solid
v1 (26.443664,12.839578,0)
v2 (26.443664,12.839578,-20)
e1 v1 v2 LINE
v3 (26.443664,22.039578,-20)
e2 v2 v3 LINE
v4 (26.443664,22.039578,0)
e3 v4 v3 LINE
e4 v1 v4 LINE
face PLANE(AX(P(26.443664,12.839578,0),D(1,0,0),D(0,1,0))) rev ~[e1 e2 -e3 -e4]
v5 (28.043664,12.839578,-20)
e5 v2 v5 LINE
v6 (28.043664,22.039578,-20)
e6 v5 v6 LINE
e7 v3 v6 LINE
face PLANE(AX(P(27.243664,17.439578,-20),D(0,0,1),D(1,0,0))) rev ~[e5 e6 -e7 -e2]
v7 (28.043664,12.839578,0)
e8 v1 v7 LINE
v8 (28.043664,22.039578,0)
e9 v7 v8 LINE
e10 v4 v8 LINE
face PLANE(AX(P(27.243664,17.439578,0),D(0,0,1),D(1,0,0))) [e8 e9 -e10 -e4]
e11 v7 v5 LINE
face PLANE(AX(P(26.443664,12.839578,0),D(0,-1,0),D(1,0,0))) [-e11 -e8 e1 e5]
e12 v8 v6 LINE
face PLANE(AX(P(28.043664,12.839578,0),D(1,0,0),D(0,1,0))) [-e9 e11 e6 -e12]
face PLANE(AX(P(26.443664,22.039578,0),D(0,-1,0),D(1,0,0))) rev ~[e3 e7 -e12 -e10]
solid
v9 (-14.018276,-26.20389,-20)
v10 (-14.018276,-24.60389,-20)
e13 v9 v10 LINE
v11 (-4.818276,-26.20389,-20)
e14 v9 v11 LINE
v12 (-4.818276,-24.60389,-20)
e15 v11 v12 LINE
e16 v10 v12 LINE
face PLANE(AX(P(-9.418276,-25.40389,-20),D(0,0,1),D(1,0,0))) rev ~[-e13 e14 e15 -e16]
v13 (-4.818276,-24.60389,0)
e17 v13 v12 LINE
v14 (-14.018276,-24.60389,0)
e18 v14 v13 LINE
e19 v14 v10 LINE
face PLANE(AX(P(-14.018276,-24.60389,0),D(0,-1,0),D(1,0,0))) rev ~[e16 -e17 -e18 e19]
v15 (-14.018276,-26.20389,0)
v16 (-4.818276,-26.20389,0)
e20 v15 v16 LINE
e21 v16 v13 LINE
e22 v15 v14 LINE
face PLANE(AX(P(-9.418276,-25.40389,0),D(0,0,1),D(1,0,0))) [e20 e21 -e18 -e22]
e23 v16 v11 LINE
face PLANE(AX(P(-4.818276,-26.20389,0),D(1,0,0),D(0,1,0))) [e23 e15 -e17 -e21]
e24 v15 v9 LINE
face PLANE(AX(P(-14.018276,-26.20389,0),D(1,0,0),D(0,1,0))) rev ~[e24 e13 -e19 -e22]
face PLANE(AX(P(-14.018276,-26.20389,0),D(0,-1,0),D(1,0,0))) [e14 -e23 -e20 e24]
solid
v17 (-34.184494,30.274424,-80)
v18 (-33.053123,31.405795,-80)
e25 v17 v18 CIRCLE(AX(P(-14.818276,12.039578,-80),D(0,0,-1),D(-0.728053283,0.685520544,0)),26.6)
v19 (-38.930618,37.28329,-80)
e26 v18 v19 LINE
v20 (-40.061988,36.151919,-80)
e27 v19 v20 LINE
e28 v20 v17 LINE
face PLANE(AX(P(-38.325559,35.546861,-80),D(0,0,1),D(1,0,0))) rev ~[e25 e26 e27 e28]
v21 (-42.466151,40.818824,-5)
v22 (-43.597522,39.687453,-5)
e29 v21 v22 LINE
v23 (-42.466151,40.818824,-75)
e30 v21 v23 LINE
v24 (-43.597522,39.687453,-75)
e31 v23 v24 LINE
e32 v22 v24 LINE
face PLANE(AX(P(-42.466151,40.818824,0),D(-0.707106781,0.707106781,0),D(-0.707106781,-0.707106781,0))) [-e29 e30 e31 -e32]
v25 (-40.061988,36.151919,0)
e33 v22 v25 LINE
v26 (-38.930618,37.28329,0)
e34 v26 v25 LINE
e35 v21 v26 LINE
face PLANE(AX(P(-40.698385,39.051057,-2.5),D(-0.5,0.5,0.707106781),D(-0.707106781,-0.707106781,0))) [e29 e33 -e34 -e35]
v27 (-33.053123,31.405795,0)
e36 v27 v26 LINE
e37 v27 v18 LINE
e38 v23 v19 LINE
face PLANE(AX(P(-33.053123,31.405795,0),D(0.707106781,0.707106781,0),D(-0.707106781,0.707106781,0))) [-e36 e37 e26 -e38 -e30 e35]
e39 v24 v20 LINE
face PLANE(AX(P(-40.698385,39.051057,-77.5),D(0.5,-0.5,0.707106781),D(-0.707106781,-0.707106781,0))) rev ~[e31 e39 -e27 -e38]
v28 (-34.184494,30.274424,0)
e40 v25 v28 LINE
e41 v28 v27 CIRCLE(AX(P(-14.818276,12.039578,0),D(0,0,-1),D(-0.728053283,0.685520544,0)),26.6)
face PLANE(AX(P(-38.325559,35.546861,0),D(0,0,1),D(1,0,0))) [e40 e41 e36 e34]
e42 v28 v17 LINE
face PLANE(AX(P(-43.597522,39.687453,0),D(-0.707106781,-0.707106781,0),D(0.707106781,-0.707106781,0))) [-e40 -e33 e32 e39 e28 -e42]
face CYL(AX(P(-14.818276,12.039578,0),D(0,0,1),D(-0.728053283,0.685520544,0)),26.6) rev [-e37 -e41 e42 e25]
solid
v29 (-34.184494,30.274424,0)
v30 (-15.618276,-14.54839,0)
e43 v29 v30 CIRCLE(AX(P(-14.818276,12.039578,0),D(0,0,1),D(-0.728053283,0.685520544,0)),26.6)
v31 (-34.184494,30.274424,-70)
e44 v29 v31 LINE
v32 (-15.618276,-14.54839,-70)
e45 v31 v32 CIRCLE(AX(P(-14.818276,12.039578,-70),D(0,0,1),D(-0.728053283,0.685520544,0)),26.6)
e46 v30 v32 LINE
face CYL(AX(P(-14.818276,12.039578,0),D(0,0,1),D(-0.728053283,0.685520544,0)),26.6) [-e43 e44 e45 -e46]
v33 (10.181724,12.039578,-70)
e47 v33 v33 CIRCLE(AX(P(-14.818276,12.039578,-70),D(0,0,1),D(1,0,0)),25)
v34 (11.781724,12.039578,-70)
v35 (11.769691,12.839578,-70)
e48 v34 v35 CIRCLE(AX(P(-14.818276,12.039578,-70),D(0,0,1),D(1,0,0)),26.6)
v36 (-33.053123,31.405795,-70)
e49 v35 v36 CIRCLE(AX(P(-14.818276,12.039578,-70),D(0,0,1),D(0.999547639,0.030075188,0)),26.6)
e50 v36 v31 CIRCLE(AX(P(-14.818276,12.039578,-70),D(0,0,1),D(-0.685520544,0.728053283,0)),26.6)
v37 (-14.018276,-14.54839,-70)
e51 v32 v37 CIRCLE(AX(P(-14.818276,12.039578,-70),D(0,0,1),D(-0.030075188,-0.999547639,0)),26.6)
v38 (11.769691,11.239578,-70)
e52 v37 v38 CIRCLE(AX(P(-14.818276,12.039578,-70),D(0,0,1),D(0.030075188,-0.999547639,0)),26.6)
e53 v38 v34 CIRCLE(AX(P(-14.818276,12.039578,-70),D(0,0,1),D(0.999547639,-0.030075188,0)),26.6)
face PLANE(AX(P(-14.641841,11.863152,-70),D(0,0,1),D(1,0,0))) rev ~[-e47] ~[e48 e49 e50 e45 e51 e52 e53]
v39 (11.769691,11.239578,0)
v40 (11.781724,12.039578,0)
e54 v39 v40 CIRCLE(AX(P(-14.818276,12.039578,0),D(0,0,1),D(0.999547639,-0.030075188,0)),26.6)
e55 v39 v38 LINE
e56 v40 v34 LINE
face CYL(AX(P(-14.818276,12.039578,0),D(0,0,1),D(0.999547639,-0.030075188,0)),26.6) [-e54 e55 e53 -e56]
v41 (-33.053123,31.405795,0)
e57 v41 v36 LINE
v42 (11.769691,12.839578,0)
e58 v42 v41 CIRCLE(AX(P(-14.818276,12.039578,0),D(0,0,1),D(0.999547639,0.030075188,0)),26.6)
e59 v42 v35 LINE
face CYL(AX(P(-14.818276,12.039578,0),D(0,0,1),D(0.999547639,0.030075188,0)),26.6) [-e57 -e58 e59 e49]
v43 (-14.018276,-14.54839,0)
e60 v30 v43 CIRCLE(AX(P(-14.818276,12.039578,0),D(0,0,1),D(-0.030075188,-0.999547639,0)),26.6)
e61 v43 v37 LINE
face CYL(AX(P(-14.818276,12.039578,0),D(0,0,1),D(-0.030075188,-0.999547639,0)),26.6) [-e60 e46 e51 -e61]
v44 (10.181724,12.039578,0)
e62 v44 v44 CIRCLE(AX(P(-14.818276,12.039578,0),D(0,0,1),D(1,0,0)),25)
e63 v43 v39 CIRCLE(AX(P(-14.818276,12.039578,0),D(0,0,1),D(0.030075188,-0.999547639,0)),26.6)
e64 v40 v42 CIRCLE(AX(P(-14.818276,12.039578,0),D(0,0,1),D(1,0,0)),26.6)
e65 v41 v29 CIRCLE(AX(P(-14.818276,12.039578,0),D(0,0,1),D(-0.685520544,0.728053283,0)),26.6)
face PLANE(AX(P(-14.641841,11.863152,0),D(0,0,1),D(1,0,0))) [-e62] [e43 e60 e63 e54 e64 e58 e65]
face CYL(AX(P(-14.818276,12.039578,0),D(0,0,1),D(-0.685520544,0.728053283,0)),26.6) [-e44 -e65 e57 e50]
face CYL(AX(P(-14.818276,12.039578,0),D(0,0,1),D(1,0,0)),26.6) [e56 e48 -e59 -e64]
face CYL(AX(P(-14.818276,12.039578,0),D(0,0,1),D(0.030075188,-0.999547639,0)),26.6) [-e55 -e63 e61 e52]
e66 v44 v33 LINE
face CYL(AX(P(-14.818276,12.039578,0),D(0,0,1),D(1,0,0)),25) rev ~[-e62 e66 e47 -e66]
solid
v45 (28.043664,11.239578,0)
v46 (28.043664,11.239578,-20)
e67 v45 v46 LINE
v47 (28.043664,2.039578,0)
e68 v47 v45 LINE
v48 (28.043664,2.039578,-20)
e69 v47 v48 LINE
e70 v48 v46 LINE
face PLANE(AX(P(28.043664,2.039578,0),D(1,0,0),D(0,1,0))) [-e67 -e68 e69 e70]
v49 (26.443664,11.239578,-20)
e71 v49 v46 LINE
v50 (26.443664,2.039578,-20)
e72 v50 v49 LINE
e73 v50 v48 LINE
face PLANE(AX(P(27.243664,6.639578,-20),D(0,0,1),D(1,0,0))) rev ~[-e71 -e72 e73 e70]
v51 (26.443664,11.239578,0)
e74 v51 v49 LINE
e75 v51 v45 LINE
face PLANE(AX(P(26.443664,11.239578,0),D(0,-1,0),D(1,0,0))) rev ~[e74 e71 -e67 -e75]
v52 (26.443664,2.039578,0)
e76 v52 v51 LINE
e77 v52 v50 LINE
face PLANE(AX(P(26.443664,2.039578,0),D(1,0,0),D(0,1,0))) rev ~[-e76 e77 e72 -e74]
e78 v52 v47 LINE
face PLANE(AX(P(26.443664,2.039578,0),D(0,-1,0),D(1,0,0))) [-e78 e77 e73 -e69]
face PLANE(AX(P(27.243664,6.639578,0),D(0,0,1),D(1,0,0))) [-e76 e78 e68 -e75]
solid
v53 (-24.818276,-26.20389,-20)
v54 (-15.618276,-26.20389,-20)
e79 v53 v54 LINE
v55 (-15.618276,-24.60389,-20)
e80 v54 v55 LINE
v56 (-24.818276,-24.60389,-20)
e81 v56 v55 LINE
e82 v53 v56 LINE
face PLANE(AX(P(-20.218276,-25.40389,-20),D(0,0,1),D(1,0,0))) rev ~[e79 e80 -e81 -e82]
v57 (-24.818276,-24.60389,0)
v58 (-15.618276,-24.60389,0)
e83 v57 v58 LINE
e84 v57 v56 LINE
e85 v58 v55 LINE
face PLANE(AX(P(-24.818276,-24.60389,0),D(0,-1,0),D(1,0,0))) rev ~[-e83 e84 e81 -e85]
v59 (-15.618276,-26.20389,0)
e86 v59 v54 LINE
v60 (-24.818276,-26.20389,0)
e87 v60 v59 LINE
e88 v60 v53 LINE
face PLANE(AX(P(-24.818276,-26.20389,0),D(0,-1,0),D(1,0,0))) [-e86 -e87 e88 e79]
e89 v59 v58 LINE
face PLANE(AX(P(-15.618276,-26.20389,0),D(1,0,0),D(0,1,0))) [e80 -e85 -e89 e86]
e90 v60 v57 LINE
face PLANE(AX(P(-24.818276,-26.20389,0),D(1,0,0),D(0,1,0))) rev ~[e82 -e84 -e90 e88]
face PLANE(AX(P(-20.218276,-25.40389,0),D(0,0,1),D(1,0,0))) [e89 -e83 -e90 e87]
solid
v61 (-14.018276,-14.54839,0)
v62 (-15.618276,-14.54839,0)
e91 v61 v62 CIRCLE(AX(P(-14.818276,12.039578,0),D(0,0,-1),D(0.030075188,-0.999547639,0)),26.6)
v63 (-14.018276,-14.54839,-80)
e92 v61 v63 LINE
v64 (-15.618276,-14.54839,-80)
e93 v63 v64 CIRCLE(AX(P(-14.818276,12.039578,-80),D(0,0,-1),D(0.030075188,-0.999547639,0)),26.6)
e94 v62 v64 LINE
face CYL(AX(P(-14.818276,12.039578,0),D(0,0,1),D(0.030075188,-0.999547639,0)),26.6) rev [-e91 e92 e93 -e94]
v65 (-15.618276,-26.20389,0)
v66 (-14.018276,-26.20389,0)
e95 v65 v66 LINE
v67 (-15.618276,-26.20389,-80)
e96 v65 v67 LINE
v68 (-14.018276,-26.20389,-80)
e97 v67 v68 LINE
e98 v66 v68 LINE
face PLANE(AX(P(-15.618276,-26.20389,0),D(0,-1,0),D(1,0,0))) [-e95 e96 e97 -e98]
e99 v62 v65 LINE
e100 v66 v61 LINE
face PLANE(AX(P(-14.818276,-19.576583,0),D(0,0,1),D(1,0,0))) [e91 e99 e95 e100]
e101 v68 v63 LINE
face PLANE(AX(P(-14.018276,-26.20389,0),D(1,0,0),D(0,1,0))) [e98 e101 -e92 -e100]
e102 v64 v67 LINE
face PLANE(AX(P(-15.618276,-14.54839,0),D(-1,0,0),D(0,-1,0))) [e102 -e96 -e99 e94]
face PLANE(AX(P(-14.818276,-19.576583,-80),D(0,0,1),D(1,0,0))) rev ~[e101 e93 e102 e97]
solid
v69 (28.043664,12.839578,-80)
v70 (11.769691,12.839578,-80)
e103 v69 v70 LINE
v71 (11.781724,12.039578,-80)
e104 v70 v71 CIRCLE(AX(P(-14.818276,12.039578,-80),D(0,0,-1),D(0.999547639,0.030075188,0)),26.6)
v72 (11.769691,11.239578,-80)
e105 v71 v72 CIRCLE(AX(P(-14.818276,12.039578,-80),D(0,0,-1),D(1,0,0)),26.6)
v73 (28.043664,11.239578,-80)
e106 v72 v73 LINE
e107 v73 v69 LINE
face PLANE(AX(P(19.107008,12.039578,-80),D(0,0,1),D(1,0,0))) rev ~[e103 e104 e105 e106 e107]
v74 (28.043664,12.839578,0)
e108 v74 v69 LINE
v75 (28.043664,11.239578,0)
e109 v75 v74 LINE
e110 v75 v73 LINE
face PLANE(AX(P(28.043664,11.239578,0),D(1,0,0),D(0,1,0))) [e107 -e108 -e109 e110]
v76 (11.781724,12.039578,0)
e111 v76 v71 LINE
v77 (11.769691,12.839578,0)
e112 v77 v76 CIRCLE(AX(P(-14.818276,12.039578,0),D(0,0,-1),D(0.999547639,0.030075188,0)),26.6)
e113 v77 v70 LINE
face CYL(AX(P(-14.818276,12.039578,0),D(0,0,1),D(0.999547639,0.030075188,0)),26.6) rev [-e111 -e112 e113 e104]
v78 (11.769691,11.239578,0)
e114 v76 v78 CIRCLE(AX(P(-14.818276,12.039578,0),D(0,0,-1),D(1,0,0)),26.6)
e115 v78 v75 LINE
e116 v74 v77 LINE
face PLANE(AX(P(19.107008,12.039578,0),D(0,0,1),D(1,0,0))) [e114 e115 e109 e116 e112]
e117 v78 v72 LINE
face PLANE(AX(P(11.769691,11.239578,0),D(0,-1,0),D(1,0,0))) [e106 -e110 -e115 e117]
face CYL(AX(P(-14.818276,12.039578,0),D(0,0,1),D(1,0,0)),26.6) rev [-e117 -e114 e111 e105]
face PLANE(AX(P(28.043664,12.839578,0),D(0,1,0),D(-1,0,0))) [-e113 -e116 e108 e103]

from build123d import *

# Parameters (mm, degrees)
F1_DEPTH = 80
F0_W     = 1.6
F0_H     = 1.6
F0_R     = 25
F2_DEPTH = 70
F3_SIZE  = 5
F0_W_2   = 9.2
F4_DEPTH = 20
F0_H_2   = 9.2


with BuildPart() as f1:
    # F0 (on Top) → F1 (new body)
    with BuildSketch(Plane.XY):
        with BuildLine():
            ThreePointArc((-34.1844936712, 30.2744241403), (-33.6273167185, 30.8486180375), (-33.0531228213, 31.4057949902))
            Line((-33.0531228213, 31.4057949902), (-42.4661514833, 40.8188236522))
            Line((-42.4661514833, 40.8188236522), (-43.5975223332, 39.6874528023))
            Line((-43.5975223332, 39.6874528023), (-34.1844936712, 30.2744241403))
        make_face()
    extrude(amount=-F1_DEPTH)

    # F3
    f3_edges = [f1.edges().sort_by_distance(p)[0] for p in [
        (-43.031837, 40.253138, -80),
        (-43.031837, 40.253138, 0),
    ]]
    chamfer(f3_edges, length=F3_SIZE)


with BuildPart() as f1b:
    # F0 (on Top) → F1, piece 2 (new body)
    with BuildSketch(Plane.XY):
        with BuildLine():
            Line((-14.0182763389, -24.6038896912), (-14.0182763389, -14.5483895453))
            ThreePointArc((-14.0182763389, -14.5483895453), (-14.8182763389, -14.5604223421), (-15.6182763389, -14.5483895453))
            Line((-15.6182763389, -14.5483895453), (-15.6182763389, -24.6038896912))
            Line((-15.6182763389, -24.6038896912), (-14.0182763389, -24.6038896912))
        make_face()
        with Locations((-14.8182763389, -25.4038896912)):
            Rectangle(F0_W, F0_H)
    extrude(amount=-F1_DEPTH)


with BuildPart() as f1c:
    # F0 (on Top) → F1, piece 3 (new body)
    with BuildSketch(Plane.XY):
        with BuildLine():
            ThreePointArc((11.7696908643, 12.8395776579), (11.7787152918, 12.4396229017), (11.7817236611, 12.0395776579))
            ThreePointArc((11.7817236611, 12.0395776579), (11.7787152918, 11.6395324142), (11.7696908643, 11.2395776579))
            Line((11.7696908643, 11.2395776579), (26.4436644382, 11.2395776579))
            Line((26.4436644382, 11.2395776579), (26.4436644382, 12.8395776579))
            Line((26.4436644382, 12.8395776579), (11.7696908643, 12.8395776579))
        make_face()
        with Locations((27.2436644382, 12.0395776579)):
            Rectangle(F0_W, F0_H)
    extrude(amount=-F1_DEPTH)


with BuildPart() as f2:
    # F0 (on Top) → F2 (new body)
    with BuildSketch(Plane.XY):
        with BuildLine():
            ThreePointArc((11.7696908643, 11.2395776579), (11.7787152918, 11.6395324142), (11.7817236611, 12.0395776579))
            ThreePointArc((11.7817236611, 12.0395776579), (11.7787152918, 12.4396229017), (11.7696908643, 12.8395776579))
            ThreePointArc((11.7696908643, 12.8395776579), (-4.638897038, 36.6147732227), (-33.0531228213, 31.4057949902))
            ThreePointArc((-33.0531228213, 31.4057949902), (-33.6273167185, 30.8486180375), (-34.1844936712, 30.2744241403))
            ThreePointArc((-34.1844936712, 30.2744241403), (-39.3934719037, 1.860198357), (-15.6182763389, -14.5483895453))
            ThreePointArc((-15.6182763389, -14.5483895453), (-14.8182763389, -14.5604223421), (-14.0182763389, -14.5483895453))
            ThreePointArc((-14.0182763389, -14.5483895453), (3.9907640406, -6.7694627217), (11.7696908643, 11.2395776579))
        make_face()
        with Locations((-14.8182763389, 12.0395776579)):
            Circle(F0_R, mode=Mode.SUBTRACT)
    extrude(amount=-F2_DEPTH)


with BuildPart() as f4:
    # F0 (on Top) → F4 (new body)
    with BuildSketch(Plane.XY):
        with Locations((-20.2182763389, -25.4038896912)):
            Rectangle(F0_W_2, F0_H)
    extrude(amount=-F4_DEPTH)


with BuildPart() as f4b:
    # F0 (on Top) → F4, piece 2 (new body)
    with BuildSketch(Plane.XY):
        with Locations((-9.4182763389, -25.4038896912)):
            Rectangle(F0_W_2, F0_H)
    extrude(amount=-F4_DEPTH)


with BuildPart() as f4c:
    # F0 (on Top) → F4, piece 3 (new body)
    with BuildSketch(Plane.XY):
        with Locations((27.2436644382, 6.6395776579)):
            Rectangle(F0_W, F0_H_2)
    extrude(amount=-F4_DEPTH)


with BuildPart() as f4d:
    # F0 (on Top) → F4, piece 4 (new body)
    with BuildSketch(Plane.XY):
        with Locations((27.2436644382, 17.4395776579)):
            Rectangle(F0_W, F0_H_2)
    extrude(amount=-F4_DEPTH)


solid = Compound([f1.part, f1b.part, f1c.part, f2.part, f4.part, f4b.part, f4c.part, f4d.part])
